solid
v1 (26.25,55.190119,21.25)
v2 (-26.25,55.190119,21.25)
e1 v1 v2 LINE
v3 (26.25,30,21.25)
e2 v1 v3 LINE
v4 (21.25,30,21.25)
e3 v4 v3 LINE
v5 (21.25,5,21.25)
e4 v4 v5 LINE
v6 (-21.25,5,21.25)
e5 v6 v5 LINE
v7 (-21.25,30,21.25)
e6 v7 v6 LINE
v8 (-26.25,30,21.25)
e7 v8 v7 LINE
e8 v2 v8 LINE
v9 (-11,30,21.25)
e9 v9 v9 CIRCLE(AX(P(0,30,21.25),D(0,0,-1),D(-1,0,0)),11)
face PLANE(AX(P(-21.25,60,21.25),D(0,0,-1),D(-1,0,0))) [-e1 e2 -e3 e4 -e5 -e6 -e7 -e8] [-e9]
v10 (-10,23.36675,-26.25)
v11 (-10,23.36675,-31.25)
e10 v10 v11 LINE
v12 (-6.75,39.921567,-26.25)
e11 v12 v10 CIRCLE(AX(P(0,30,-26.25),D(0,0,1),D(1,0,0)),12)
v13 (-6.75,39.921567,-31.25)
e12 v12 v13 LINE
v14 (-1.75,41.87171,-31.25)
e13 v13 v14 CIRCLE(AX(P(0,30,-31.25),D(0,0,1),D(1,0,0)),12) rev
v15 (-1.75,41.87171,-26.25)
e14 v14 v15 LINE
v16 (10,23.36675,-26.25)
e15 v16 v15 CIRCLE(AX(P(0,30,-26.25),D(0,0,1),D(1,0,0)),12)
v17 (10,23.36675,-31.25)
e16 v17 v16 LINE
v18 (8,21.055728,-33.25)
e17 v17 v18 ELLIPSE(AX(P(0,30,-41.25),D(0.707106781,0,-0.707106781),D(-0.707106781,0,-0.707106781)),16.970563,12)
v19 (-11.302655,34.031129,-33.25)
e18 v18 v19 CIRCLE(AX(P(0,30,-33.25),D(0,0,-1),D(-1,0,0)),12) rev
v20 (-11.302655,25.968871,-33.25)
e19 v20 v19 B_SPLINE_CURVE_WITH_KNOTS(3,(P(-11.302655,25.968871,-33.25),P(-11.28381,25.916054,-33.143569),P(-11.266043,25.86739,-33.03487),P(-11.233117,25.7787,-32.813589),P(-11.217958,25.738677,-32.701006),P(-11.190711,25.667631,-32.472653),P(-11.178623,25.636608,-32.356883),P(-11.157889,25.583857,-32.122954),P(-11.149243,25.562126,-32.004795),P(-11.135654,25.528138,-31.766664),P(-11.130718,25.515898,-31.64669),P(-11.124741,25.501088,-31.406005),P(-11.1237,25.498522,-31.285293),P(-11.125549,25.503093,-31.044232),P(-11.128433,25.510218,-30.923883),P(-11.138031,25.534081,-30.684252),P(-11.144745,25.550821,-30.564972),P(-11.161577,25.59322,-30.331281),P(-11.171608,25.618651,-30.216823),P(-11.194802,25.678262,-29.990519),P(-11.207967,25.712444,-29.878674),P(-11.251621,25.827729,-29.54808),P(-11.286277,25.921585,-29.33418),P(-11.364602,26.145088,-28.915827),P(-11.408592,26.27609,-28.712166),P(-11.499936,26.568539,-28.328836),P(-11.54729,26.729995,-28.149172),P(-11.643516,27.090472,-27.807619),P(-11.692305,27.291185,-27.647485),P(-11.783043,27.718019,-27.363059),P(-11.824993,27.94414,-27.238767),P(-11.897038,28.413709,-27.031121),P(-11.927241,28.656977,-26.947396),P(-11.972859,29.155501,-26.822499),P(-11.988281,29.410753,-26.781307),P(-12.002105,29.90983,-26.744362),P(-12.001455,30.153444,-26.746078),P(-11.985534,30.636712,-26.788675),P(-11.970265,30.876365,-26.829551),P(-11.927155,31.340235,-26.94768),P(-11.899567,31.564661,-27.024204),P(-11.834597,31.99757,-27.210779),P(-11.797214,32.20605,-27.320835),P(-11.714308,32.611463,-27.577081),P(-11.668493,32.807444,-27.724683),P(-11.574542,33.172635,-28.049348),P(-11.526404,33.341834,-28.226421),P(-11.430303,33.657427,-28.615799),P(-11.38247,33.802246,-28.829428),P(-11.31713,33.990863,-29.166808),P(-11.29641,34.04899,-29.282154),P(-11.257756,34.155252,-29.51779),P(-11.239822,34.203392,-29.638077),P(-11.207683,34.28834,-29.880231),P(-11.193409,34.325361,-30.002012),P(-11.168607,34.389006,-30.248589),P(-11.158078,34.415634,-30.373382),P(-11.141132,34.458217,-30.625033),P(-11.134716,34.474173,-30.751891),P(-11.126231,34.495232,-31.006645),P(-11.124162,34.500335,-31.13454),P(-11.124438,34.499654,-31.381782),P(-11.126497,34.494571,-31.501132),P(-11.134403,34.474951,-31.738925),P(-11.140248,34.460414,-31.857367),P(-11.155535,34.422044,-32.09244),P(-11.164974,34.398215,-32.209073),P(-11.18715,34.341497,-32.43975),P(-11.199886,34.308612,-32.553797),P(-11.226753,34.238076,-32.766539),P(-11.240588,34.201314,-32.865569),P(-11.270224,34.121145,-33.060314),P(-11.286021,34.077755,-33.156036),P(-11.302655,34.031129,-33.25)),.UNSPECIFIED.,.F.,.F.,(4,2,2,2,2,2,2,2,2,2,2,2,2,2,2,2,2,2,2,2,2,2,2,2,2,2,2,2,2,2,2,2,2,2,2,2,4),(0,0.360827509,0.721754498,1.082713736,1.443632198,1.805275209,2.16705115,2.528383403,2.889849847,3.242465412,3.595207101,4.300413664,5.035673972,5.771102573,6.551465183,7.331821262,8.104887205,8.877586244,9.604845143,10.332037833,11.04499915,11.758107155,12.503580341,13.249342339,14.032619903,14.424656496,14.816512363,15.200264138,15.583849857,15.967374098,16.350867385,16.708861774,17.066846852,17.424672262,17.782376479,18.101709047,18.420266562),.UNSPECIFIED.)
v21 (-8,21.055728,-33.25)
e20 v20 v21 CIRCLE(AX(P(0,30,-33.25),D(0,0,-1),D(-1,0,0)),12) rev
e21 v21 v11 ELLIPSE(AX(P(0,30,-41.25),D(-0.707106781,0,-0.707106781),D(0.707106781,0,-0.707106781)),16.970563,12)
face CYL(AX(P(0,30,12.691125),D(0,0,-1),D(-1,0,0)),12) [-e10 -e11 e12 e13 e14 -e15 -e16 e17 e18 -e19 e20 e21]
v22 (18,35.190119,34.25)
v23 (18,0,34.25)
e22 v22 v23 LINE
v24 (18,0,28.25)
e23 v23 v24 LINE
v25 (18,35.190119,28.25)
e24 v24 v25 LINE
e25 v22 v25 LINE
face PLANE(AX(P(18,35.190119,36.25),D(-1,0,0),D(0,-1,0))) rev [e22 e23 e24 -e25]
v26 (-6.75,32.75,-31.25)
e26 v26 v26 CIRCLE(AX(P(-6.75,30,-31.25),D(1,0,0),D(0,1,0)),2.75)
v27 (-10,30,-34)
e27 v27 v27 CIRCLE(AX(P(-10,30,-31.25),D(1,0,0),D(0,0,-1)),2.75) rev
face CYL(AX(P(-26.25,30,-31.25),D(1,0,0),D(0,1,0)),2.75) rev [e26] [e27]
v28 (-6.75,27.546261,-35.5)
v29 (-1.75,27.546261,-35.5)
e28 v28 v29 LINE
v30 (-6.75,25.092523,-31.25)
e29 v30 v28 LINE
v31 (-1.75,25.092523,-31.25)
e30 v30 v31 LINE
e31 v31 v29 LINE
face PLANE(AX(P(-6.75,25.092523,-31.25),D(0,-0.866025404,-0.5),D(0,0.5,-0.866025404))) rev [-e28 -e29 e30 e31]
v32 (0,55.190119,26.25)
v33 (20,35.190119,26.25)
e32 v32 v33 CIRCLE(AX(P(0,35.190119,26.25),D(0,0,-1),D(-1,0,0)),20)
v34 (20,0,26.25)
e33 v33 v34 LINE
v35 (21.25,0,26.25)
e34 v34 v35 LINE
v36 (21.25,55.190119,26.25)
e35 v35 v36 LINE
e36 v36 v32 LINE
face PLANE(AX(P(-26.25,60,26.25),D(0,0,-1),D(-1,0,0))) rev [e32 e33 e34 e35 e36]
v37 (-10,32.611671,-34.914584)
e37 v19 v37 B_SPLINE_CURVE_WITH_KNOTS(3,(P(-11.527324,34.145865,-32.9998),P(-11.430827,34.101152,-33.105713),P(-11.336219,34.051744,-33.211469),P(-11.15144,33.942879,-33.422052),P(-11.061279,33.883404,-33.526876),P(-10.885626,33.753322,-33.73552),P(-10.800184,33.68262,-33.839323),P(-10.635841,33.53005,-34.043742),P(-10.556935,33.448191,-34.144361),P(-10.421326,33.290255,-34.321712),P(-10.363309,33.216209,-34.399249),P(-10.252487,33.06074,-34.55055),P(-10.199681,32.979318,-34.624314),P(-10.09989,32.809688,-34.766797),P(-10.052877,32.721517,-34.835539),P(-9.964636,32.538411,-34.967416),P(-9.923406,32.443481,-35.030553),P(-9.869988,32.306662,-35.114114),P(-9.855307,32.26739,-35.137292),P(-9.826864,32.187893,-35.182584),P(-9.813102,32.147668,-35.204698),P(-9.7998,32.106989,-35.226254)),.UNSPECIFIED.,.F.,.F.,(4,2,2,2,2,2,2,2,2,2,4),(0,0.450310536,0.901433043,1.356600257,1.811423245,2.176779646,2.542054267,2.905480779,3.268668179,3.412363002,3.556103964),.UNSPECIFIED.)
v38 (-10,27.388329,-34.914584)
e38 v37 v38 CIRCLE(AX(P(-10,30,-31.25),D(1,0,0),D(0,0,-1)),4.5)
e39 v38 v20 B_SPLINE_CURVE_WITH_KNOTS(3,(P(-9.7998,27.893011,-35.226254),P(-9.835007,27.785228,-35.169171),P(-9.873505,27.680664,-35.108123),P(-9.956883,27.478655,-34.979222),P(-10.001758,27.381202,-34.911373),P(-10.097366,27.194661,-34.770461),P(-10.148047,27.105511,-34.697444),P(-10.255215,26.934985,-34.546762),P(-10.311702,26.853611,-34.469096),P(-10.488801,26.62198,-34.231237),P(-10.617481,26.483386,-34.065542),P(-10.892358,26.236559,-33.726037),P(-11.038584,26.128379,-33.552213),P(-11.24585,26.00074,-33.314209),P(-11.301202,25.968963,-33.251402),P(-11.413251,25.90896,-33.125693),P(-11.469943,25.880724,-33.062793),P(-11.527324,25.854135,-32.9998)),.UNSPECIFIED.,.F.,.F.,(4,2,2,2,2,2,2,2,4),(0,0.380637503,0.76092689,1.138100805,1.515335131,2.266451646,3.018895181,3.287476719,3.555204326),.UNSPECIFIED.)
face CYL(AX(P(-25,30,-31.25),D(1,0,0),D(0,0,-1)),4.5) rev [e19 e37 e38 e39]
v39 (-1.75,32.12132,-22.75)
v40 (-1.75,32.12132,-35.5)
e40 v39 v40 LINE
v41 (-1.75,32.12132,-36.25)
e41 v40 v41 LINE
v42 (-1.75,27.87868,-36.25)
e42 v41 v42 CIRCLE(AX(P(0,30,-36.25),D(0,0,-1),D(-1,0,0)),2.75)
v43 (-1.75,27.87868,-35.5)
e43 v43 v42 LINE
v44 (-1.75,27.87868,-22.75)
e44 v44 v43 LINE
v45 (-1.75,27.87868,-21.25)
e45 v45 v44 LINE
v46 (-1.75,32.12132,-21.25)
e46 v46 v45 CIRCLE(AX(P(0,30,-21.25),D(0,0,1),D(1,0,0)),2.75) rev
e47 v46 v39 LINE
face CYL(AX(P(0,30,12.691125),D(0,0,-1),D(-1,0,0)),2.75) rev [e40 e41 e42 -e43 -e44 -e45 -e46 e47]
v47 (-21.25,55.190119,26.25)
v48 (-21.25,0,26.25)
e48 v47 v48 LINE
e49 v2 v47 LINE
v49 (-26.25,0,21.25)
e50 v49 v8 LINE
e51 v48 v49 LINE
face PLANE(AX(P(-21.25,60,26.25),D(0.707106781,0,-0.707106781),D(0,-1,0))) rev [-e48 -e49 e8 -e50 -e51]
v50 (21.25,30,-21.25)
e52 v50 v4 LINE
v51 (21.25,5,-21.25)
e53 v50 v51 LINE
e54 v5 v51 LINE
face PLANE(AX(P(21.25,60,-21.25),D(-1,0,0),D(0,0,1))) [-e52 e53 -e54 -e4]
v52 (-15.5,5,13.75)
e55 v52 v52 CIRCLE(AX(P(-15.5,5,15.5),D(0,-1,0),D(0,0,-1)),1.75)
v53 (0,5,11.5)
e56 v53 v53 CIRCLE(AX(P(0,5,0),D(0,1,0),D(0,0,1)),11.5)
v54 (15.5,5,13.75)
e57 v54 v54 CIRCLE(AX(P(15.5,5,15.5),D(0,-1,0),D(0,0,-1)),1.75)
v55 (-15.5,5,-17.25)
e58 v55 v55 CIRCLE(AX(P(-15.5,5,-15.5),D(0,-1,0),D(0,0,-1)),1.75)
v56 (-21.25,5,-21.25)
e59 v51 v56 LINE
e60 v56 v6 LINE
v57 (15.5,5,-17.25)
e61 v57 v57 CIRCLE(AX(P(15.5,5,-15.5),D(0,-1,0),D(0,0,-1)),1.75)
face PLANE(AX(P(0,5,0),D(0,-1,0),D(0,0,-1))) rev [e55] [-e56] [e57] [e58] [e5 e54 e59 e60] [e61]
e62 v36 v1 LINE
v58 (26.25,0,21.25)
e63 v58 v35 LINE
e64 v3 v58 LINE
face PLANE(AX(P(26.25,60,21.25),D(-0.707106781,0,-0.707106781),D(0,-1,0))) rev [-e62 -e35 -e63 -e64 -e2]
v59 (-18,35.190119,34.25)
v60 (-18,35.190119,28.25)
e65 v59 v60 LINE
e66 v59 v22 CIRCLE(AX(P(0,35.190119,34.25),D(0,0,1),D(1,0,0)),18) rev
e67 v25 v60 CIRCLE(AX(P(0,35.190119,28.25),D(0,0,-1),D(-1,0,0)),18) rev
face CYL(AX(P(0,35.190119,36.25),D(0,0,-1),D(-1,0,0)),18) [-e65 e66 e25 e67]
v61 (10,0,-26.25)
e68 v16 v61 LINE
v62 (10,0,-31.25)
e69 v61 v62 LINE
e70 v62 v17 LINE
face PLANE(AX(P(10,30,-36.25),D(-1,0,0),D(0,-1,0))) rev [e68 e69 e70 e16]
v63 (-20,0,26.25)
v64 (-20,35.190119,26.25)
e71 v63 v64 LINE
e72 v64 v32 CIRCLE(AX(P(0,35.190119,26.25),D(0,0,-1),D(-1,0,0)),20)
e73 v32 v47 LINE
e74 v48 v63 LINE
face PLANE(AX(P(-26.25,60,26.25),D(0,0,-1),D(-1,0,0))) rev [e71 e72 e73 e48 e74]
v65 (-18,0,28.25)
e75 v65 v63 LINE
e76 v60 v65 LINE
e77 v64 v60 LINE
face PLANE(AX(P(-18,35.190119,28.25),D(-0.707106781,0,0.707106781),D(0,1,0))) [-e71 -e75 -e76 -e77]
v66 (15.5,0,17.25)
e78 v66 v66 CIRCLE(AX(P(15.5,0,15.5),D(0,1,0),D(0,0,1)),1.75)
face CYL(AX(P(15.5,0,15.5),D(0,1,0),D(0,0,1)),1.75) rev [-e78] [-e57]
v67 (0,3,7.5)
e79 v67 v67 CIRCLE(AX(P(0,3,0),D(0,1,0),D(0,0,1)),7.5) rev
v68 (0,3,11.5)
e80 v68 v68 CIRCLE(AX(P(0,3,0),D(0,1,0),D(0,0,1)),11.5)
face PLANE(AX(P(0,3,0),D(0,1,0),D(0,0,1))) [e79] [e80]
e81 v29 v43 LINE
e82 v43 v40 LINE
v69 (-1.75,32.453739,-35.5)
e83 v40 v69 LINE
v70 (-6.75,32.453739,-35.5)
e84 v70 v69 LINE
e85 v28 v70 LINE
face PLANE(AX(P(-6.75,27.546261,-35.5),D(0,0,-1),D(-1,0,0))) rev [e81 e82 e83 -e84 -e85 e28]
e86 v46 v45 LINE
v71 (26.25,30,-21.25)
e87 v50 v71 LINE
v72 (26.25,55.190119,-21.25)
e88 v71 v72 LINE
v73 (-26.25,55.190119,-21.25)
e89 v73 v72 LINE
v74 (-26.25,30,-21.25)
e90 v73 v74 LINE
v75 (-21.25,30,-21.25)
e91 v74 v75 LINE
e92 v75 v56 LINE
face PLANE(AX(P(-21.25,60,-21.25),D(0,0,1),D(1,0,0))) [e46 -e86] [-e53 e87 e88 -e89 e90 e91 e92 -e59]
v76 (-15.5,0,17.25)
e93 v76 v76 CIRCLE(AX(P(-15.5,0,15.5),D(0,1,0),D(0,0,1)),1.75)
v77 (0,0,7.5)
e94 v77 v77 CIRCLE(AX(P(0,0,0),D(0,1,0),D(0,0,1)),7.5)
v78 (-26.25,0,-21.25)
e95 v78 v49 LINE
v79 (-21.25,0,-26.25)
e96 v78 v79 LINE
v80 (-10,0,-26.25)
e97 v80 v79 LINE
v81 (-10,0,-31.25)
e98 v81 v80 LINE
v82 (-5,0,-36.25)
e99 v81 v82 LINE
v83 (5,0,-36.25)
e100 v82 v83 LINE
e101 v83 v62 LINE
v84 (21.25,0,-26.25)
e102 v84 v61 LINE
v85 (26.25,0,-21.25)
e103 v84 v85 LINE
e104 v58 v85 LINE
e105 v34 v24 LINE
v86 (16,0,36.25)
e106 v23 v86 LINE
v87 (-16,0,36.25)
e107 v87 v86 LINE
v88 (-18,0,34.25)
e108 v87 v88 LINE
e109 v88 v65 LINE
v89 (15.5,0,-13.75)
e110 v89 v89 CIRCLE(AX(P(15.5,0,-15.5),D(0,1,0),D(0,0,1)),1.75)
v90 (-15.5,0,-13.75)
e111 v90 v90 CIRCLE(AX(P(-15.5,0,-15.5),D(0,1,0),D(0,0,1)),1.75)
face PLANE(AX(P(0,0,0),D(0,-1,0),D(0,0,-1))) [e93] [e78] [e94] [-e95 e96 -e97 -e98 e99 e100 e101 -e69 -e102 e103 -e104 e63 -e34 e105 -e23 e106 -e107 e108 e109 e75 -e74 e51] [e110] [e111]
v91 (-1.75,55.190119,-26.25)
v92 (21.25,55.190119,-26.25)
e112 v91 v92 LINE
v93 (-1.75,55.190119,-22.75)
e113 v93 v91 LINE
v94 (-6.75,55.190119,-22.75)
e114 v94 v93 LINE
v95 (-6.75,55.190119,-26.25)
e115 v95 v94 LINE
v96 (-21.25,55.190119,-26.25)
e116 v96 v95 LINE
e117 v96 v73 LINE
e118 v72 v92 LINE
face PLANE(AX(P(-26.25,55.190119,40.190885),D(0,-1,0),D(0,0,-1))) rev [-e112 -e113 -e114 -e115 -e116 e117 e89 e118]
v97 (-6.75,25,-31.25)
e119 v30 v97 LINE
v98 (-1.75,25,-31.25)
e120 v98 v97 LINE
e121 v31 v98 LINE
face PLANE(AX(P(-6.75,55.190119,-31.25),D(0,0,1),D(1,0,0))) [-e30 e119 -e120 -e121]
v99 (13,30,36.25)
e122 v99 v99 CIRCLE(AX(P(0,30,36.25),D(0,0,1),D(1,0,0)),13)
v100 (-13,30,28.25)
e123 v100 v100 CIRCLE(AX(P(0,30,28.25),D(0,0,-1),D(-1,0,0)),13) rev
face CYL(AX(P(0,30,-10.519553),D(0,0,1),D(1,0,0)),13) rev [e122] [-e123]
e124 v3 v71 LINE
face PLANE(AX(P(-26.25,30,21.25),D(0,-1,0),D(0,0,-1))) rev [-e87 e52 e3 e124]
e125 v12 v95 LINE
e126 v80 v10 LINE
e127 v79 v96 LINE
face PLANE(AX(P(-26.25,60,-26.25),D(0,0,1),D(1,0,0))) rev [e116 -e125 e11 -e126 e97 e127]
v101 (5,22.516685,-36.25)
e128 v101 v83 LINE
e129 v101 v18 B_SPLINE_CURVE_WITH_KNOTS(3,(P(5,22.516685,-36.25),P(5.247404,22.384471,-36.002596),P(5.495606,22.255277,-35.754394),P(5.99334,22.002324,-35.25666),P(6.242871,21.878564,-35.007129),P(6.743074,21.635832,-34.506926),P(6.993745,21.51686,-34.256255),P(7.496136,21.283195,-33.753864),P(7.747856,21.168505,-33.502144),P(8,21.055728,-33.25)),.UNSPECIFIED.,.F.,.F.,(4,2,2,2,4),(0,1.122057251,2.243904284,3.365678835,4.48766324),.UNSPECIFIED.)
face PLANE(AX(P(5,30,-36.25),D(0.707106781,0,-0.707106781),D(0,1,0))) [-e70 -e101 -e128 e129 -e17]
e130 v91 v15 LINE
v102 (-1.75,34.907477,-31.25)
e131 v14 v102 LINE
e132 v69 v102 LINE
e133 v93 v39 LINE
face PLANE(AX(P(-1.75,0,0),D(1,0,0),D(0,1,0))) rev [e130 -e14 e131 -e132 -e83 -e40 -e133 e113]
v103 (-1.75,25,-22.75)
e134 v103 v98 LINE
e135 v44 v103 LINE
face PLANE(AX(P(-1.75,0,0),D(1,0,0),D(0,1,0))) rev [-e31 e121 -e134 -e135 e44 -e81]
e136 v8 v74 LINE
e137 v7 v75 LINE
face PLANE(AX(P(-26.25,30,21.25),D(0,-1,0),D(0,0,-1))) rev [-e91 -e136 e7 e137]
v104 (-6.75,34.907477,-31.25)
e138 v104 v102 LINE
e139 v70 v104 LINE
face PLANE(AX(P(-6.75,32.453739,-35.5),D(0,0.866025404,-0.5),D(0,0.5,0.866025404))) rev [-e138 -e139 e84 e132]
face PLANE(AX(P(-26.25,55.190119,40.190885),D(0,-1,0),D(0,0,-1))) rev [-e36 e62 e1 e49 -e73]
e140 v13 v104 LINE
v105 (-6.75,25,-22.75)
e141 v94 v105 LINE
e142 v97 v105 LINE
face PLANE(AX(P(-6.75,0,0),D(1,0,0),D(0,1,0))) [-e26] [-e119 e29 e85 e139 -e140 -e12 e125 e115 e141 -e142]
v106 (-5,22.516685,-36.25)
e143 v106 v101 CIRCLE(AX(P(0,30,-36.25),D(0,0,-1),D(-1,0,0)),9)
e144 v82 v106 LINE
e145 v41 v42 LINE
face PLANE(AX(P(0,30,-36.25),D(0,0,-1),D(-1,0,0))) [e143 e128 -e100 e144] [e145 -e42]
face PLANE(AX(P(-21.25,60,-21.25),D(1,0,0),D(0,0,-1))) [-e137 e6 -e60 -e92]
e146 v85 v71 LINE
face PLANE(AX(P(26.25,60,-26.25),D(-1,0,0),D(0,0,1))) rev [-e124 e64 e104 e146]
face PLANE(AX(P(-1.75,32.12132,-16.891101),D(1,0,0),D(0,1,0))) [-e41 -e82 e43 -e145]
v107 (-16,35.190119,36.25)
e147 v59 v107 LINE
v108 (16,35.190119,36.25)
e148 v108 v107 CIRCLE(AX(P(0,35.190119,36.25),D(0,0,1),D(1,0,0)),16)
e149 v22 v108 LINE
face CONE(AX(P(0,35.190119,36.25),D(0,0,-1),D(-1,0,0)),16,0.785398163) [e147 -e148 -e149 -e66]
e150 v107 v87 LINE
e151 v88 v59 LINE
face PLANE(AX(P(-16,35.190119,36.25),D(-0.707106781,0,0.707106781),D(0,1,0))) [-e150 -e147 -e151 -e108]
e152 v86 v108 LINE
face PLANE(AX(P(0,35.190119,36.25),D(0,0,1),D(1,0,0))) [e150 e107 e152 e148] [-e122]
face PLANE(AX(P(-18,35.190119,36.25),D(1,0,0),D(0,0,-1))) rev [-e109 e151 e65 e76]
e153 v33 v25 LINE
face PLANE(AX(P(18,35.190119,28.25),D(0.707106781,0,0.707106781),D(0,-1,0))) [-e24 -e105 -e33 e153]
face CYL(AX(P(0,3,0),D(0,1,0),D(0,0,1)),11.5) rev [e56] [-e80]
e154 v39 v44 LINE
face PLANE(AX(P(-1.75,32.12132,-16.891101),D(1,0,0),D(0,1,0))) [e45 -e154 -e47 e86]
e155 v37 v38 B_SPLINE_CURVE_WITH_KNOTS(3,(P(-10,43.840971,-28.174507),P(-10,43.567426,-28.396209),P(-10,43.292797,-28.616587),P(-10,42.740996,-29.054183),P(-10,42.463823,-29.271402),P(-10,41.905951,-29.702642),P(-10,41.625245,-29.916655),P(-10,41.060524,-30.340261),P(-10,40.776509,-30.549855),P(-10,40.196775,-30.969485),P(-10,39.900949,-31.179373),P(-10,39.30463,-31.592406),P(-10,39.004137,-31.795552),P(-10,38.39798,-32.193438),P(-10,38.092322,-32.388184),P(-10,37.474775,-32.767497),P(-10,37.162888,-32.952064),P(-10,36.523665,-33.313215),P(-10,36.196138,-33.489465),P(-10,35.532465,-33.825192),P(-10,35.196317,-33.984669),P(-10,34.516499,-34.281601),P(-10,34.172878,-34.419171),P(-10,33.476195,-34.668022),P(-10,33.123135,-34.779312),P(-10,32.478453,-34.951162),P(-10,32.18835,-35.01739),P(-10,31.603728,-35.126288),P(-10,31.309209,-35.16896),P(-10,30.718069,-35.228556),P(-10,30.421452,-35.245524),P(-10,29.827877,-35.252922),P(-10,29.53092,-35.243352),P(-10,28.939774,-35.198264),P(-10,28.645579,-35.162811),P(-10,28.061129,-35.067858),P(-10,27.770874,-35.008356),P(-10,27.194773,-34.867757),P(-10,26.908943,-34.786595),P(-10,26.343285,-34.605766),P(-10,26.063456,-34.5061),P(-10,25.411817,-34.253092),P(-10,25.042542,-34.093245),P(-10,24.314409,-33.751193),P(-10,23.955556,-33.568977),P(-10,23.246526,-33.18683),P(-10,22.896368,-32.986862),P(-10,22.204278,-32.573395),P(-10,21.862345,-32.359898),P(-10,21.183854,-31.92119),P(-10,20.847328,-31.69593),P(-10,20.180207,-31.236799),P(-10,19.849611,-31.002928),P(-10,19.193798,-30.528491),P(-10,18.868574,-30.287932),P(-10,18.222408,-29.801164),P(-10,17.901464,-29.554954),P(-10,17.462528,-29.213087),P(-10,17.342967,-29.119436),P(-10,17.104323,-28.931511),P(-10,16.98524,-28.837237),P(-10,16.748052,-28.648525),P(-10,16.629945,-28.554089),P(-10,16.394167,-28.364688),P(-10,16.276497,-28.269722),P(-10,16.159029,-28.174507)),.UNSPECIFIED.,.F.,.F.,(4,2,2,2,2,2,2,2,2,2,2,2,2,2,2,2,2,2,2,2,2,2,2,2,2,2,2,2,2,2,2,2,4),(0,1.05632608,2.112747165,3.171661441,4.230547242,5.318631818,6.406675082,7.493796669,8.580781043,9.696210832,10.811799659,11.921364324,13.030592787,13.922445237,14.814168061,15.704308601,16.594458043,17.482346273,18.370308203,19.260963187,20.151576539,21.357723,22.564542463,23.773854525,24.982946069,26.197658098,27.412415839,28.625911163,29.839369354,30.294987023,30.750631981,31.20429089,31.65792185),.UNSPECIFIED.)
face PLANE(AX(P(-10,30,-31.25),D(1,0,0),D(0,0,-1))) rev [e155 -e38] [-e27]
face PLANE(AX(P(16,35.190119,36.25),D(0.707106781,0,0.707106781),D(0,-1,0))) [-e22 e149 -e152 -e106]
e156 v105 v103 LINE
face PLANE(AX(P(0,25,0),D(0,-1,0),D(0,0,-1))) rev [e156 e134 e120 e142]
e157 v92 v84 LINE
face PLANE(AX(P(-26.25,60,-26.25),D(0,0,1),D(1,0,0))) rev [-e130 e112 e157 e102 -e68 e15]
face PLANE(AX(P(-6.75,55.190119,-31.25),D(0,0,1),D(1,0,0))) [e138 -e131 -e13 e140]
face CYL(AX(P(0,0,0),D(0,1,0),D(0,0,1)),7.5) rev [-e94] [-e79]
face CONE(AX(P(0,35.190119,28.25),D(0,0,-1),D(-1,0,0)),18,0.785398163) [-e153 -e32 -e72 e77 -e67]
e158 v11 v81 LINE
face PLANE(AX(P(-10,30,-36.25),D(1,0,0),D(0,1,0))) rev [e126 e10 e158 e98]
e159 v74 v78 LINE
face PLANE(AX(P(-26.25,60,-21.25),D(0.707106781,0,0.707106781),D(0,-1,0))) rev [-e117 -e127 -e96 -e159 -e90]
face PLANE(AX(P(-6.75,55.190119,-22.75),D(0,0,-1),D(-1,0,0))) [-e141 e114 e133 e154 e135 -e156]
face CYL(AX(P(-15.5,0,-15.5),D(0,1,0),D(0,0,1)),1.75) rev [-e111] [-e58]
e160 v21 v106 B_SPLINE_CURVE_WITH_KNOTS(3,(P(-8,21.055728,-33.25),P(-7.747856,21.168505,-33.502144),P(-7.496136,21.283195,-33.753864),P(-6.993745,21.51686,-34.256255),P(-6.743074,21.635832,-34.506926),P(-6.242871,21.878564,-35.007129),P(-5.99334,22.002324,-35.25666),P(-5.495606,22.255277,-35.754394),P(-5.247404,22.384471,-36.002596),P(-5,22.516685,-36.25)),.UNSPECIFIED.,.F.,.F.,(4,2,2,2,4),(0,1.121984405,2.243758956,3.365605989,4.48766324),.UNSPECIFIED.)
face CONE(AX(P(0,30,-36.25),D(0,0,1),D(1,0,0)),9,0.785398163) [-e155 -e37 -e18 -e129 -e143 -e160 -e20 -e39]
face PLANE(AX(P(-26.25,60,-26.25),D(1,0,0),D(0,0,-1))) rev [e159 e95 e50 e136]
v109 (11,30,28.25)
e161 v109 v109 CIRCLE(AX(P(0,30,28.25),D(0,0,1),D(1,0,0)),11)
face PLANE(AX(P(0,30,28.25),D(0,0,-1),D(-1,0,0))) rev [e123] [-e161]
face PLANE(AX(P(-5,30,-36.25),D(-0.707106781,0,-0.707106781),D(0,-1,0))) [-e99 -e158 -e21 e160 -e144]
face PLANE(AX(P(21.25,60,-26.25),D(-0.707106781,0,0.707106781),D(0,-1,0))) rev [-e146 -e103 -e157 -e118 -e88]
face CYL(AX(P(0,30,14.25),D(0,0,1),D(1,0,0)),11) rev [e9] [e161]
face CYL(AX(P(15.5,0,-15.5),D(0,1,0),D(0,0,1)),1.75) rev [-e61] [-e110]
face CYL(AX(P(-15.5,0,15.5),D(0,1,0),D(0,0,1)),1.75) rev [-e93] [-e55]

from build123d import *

# Parameters (mm, degrees)
SKETCH1_W                = 52.5
SKETCH1_H                = 52.5
SKETCH1_W_2              = 42.5
SKETCH1_H_2              = 42.5
BOSS_EXTRUDE1_DEPTH      = 60
SKETCH2_W                = 42.5
SKETCH2_H                = 42.5
BOSS_EXTRUDE2_DEPTH      = 5
CUT_EXTRUDE1_DEPTH       = 67.3560472
CUT_EXTRUDE1_DEPTH_BACK  = 67.3560472
SKETCH3_R                = 1.75
SKETCH3_R_2              = 7.5
SKETCH4_R                = 11.5
CUT_EXTRUDE2_DEPTH       = 2
SKETCH5_R                = 0.75
SKETCH5_R_2              = 3.5
BOSS_EXTRUDE3_DEPTH      = 10
CUT_EXTRUDE3_DEPTH       = 84.936359821
CUT_EXTRUDE3_DEPTH_BACK  = 84.936359821
SKETCH6_W                = 52.5
SKETCH6_H                = 16.216064207
CUT_EXTRUDE4_START       = -23
SKETCH7_R                = 3.5
SKETCH7_R_2              = 0.75
CUT_EXTRUDE4_DEPTH       = 23
CHAMFER1_SIZE            = 5
CHAMFER3_SIZE            = 2
CHAMFER4_SIZE            = 1
SKETCH8_R                = 13
BOSS_EXTRUDE4_DEPTH      = 10
SKETCH9_R                = 12
CUT_EXTRUDE5_DEPTH       = 10
CHAMFER5_SIZE            = 2
CUT_EXTRUDE6_DEPTH       = 85.677697815
CUT_EXTRUDE6_DEPTH_BACK  = 85.677697815
SKETCH10_W               = 42.5
SKETCH10_H               = 45.698966911
SKETCH11_R               = 13
CUT_EXTRUDE7_DEPTH       = 10
SKETCH12_R               = 13
BOSS_EXTRUDE6_DEPTH      = 15
BOSS_EXTRUDE7_START      = -8
SKETCH13_R               = 13
BOSS_EXTRUDE7_DEPTH      = 7
SKETCH14_R               = 11
CUT_EXTRUDE8_DEPTH       = 14
SKETCH15_W               = 68.151817742
SKETCH15_H               = 162.163599098
CUT_EXTRUDE9_DEPTH       = 34
BOSS_EXTRUDE8_REACH      = 99.7
SKETCH16_R               = 12
SKETCH16_R_2             = 2.75
BOSS_EXTRUDE9_DEPTH      = 15
CHAMFER6_SIZE            = 3
CUT_EXTRUDE10_DEPTH      = 75.854024608
CUT_EXTRUDE10_DEPTH_BACK = 75.854024608
SKETCH18_W               = 80.381770786
SKETCH18_H               = 10.493887453
SKETCH19_R               = 2.75
CUT_EXTRUDE11_DEPTH      = 5
CUT_EXTRUDE12_START      = 25
SKETCH20_W               = 5
SKETCH20_H               = 8.5
CUT_EXTRUDE12_DEPTH      = 47.056838389
CUT_EXTRUDE13_DEPTH      = 72.721766444
CUT_EXTRUDE15_START      = -10
SKETCH21_R               = 4.5
CUT_EXTRUDE15_DEPTH      = 15


with BuildPart() as part:
    # Sketch1 → Boss-Extrude1 (new body)
    with BuildSketch(Plane(origin=(0, 0, 0), x_dir=(1, 0, 0), z_dir=(0, 1, 0))):
        Rectangle(SKETCH1_W, SKETCH1_H)
        Rectangle(SKETCH1_W_2, SKETCH1_H_2, mode=Mode.SUBTRACT)
    extrude(amount=BOSS_EXTRUDE1_DEPTH)

    # Sketch2 → Boss-Extrude2 (add)
    with BuildSketch(Plane(origin=(0, 0, 0), x_dir=(1, 0, 0), z_dir=(0, 1, 0))):
        Rectangle(SKETCH2_W, SKETCH2_H)
    extrude(amount=BOSS_EXTRUDE2_DEPTH)

    # Sketch3 → Cut-Extrude1 (cut, two sides: drawn at the far end of the back side and taken through both)
    with BuildSketch(Plane(origin=(0, 5, 0), x_dir=(1, 0, 0), z_dir=(0, 1, 0)).offset(-CUT_EXTRUDE1_DEPTH_BACK)):
        with Locations(Location((-15.5, 15.5, 0), (0, 0, 270))):
            Circle(SKETCH3_R)
        with Locations(Location((-15.5, -15.5, 0), (0, 0, 270))):
            Circle(SKETCH3_R)
        with Locations(Location((15.5, 15.5, 0), (0, 0, 270))):
            Circle(SKETCH3_R)
        with Locations(Location((15.5, -15.5, 0), (0, 0, 270))):
            Circle(SKETCH3_R)
        with Locations(Location((0, 0, 0), (0, 0, 270))):
            Circle(SKETCH3_R_2)
    extrude(amount=CUT_EXTRUDE1_DEPTH + CUT_EXTRUDE1_DEPTH_BACK, mode=Mode.SUBTRACT)

    # Sketch4 → Cut-Extrude2 (cut)
    with BuildSketch(Plane(origin=(0, 5, 0), x_dir=(1, 0, 0), z_dir=(0, 1, 0))):
        with Locations(Location((0, 0, 0), (0, 0, 270))):
            Circle(SKETCH4_R)
    extrude(amount=-CUT_EXTRUDE2_DEPTH, mode=Mode.SUBTRACT)

    # Sketch5 → Boss-Extrude3 (add)
    with BuildSketch(Plane(origin=(0, 0, -26.25), x_dir=(-1, 0, 0), z_dir=(0, 0, -1))):
        with BuildLine():
            Line((10, 30), (10, -2.899053056))
            ThreePointArc((10, -2.899053056), (0, -12.899053056), (-10, -2.899053056))
            Line((-10, -2.899053056), (-10, 30))
            ThreePointArc((-10, 30), (0, 40), (10, 30))
        make_face()
        with Locations((-4, 37)):
            Circle(SKETCH5_R, mode=Mode.SUBTRACT)
        with Locations((0, 37)):
            Circle(SKETCH5_R, mode=Mode.SUBTRACT)
        with Locations((4, 37)):
            Circle(SKETCH5_R, mode=Mode.SUBTRACT)
        with Locations((-7, 34)):
            Circle(SKETCH5_R, mode=Mode.SUBTRACT)
        with Locations((-7, 30)):
            Circle(SKETCH5_R, mode=Mode.SUBTRACT)
        with Locations((-7, 26)):
            Circle(SKETCH5_R, mode=Mode.SUBTRACT)
        with Locations((-4, 23)):
            Circle(SKETCH5_R, mode=Mode.SUBTRACT)
        with Locations((0, 23)):
            Circle(SKETCH5_R, mode=Mode.SUBTRACT)
        with Locations((4, 23)):
            Circle(SKETCH5_R, mode=Mode.SUBTRACT)
        with Locations((7, 26)):
            Circle(SKETCH5_R, mode=Mode.SUBTRACT)
        with Locations((7, 30)):
            Circle(SKETCH5_R, mode=Mode.SUBTRACT)
        with Locations((7, 34)):
            Circle(SKETCH5_R, mode=Mode.SUBTRACT)
        with Locations((0, 30)):
            Circle(SKETCH5_R_2, mode=Mode.SUBTRACT)
    extrude(amount=BOSS_EXTRUDE3_DEPTH)

    # Sketch6 → Cut-Extrude3 (cut, two sides: drawn at the far end of the back side and taken through both)
    with BuildSketch(Plane(origin=(0, 0, -26.25), x_dir=(-1, 0, 0), z_dir=(0, 0, -1)).offset(-CUT_EXTRUDE3_DEPTH_BACK)):
        with Locations((0, -8.108032104)):
            Rectangle(SKETCH6_W, SKETCH6_H)
    extrude(amount=CUT_EXTRUDE3_DEPTH + CUT_EXTRUDE3_DEPTH_BACK, mode=Mode.SUBTRACT)

    # Sketch7 → Cut-Extrude4 (cut)
    with BuildSketch(Plane(origin=(0, 0, -26.25), x_dir=(-1, 0, 0), z_dir=(0, 0, -1)).offset(CUT_EXTRUDE4_START)):
        with Locations(Location((0, 30, 0), (0, 0, 180))):
            Circle(SKETCH7_R)
        with Locations(Location((-4, 37, 0), (0, 0, 180))):
            Circle(SKETCH7_R_2)
        with Locations(Location((0, 37, 0), (0, 0, 180))):
            Circle(SKETCH7_R_2)
        with Locations(Location((4, 37, 0), (0, 0, 180))):
            Circle(SKETCH7_R_2)
        with Locations(Location((7, 34, 0), (0, 0, 180))):
            Circle(SKETCH7_R_2)
        with Locations(Location((7, 30, 0), (0, 0, 180))):
            Circle(SKETCH7_R_2)
        with Locations(Location((7, 26, 0), (0, 0, 180))):
            Circle(SKETCH7_R_2)
        with Locations(Location((4, 23, 0), (0, 0, 180))):
            Circle(SKETCH7_R_2)
        with Locations(Location((0, 23, 0), (0, 0, 180))):
            Circle(SKETCH7_R_2)
        with Locations(Location((-4, 23, 0), (0, 0, 180))):
            Circle(SKETCH7_R_2)
        with Locations(Location((-7, 26, 0), (0, 0, 180))):
            Circle(SKETCH7_R_2)
        with Locations(Location((-7, 30, 0), (0, 0, 180))):
            Circle(SKETCH7_R_2)
        with Locations(Location((-7, 34, 0), (0, 0, 180))):
            Circle(SKETCH7_R_2)
    extrude(amount=CUT_EXTRUDE4_DEPTH, mode=Mode.SUBTRACT)

    # Chamfer1
    # the kernel refuses this chamfer: 5 mm, written as the material it takes off along each edge
    with BuildSketch(Plane(origin=(26.25, -12.85841494, 26.25), x_dir=(-0.9996219169112968, 0, 0.027495876610586317), z_dir=(0, 1, 0)), Plane(origin=(-26.25, -12.85841494, 26.25), x_dir=(-0.027495876610586317, 0, -0.9996219169112968), z_dir=(0, 1, 0))) as chamfer1_piece_1:
        Polygon((CHAMFER1_SIZE * 0.999621916911, -CHAMFER1_SIZE * 0.0274958766106), (-CHAMFER1_SIZE * 0.0274958766106, -CHAMFER1_SIZE * 0.999621916911), (0, 0), align=None)
    extrude(amount=85.71682988, mode=Mode.SUBTRACT)
    with BuildSketch(Plane(origin=(26.25, -12.85841494, -26.25), x_dir=(-0.9996219169112968, 0, -0.027495876610586317), z_dir=(0, 1, 0)), Plane(origin=(-26.25, -12.85841494, -26.25), x_dir=(-0.027495876610586317, 0, 0.9996219169112968), z_dir=(0, 1, 0))) as chamfer1_piece_2:
        Polygon((CHAMFER1_SIZE * 0.999621916911, CHAMFER1_SIZE * 0.0274958766106), (-CHAMFER1_SIZE * 0.0274958766106, CHAMFER1_SIZE * 0.999621916911), (0, 0), align=None)
    extrude(amount=85.71682988, mode=Mode.SUBTRACT)
    with BuildSketch(Plane(origin=(-10, 30, -36.25), x_dir=(-0.027495876610586317, 0, 0.9996219169112968), z_dir=(0, -1, 0)), Plane(origin=(10, -12.85841494, -36.25), x_dir=(0.027495876610586317, 0, 0.9996219169112968), z_dir=(0, 1, 0))) as chamfer1_piece_3:
        Polygon((CHAMFER1_SIZE * 0.999621916911, -CHAMFER1_SIZE * 0.0274958766106), (-CHAMFER1_SIZE * 0.0274958766106, -CHAMFER1_SIZE * 0.999621916911), (0, 0), align=None)
    extrude(amount=42.85841494, mode=Mode.SUBTRACT)
    with BuildSketch(Plane(origin=(0, 30, -36.25), x_dir=(1, 0, 0), z_dir=(0, -1, 0))) as chamfer1_piece_4:
        Polygon((10, CHAMFER1_SIZE), (10 - CHAMFER1_SIZE, 0), (10, 0), align=None)
    revolve(axis=Axis((0, 30, -36.25), (0, 0, 1)), revolution_arc=180, mode=Mode.SUBTRACT)

    # Chamfer3
    chamfer3_edges = [part.edges().sort_by_distance(p)[0] for p in [
        (21.25, 60, 0),
        (0, 60, -21.25),
        (-21.25, 60, 0),
        (0, 60, 21.25),
    ]]
    chamfer(chamfer3_edges, length=CHAMFER3_SIZE)

    # Chamfer4
    chamfer4_edges = [part.edges().sort_by_distance(p)[0] for p in [
        (-3.5, 30, -21.25),
        (3.5, 30, -36.25),
    ]]
    chamfer(chamfer4_edges, length=CHAMFER4_SIZE)

    # Sketch8 → Boss-Extrude4 (add)
    with BuildSketch(Plane.XY.offset(26.25)):
        with BuildLine():
            Line((18, 35.190119423), (18, 0))
            Line((18, 0), (-18, 0))
            Line((-18, 0), (-18, 35.190119423))
            ThreePointArc((-18, 35.190119423), (0, 53.190119423), (18, 35.190119423))
        make_face()
        with Locations((0, 35.190119423)):
            Circle(SKETCH8_R, mode=Mode.SUBTRACT)
    extrude(amount=BOSS_EXTRUDE4_DEPTH)

    # Sketch9 → Cut-Extrude5 (cut)
    with BuildSketch(Plane.XY.offset(26.25)):
        with Locations((0, 35.190119423)):
            Circle(SKETCH9_R)
    extrude(amount=-CUT_EXTRUDE5_DEPTH, mode=Mode.SUBTRACT)

    # Chamfer5
    chamfer5_edges = [part.edges().sort_by_distance(p)[0] for p in [
        (0, 53.190119423, 36.25),
        (-18, 17.595059711, 36.25),
        (18, 17.595059711, 36.25),
        (0, 53.190119423, 26.25),
        (-18, 17.595059711, 26.25),
        (18, 17.595059711, 26.25),
    ]]
    chamfer(chamfer5_edges, length=CHAMFER5_SIZE)

    # Sketch10 → Cut-Extrude6 (cut, two sides: drawn at the far end of the back side and taken through both)
    with BuildSketch(Plane(origin=(-21.25, 0, 0), x_dir=(0, 0, -1), z_dir=(1, 0, 0)).offset(-CUT_EXTRUDE6_DEPTH_BACK)):
        with Locations((0, 52.849483455)):
            Rectangle(SKETCH10_W, SKETCH10_H)
    extrude(amount=CUT_EXTRUDE6_DEPTH + CUT_EXTRUDE6_DEPTH_BACK, mode=Mode.SUBTRACT)

    # Sketch11 → Cut-Extrude7 (cut)
    with BuildSketch(Plane.XY.offset(36.25)):
        with Locations((0, 30)):
            Circle(SKETCH11_R)
    extrude(amount=-CUT_EXTRUDE7_DEPTH, mode=Mode.SUBTRACT)

    # Sketch12 → Boss-Extrude6 (add)
    with BuildSketch(Plane.XY.offset(36.25)):
        with BuildLine():
            Line((13.742429917, 37), (13.742429917, 8.778772007))
            ThreePointArc((13.742429917, 8.778772007), (0, -4.96365791), (-13.742429917, 8.778772007))
            Line((-13.742429917, 8.778772007), (-13.742429917, 37))
            ThreePointArc((-13.742429917, 37), (0, 50.742429917), (13.742429917, 37))
        make_face()
        with Locations((0, 30)):
            Circle(SKETCH12_R, mode=Mode.SUBTRACT)
    extrude(amount=-BOSS_EXTRUDE6_DEPTH)

    # Sketch13 → Boss-Extrude7 (add)
    with BuildSketch(Plane.XY.offset(36.25).offset(BOSS_EXTRUDE7_START)):
        with Locations((0, 30)):
            Circle(SKETCH13_R)
    extrude(amount=-BOSS_EXTRUDE7_DEPTH)

    # Sketch14 → Cut-Extrude8 (cut)
    with BuildSketch(Plane.XY.offset(28.25)):
        with Locations((0, 30)):
            Circle(SKETCH14_R)
    extrude(amount=-CUT_EXTRUDE8_DEPTH, mode=Mode.SUBTRACT)

    # Sketch15 → Cut-Extrude9 (cut)
    with BuildSketch(Plane.XZ):
        Rectangle(SKETCH15_W, SKETCH15_H)
    extrude(amount=CUT_EXTRUDE9_DEPTH, mode=Mode.SUBTRACT)

    # Boss-Extrude8: up to this face of the body (flat: up to its plane)
    boss_extrude8_end = Plane(part.part.faces().sort_by_distance((23.75, 30.760345316, -21.25))[0])
    # Sketch16 → Boss-Extrude8 (add, up to the picked face)
    with BuildSketch(Plane(origin=(0, 0, -36.25), x_dir=(-1, 0, 0), z_dir=(0, 0, -1)), mode=Mode.PRIVATE) as boss_extrude8_sk1:
        with Locations((0, 30)):
            Circle(SKETCH16_R)
        with Locations((0, 30)):
            Circle(SKETCH16_R_2, mode=Mode.SUBTRACT)
    boss_extrude8_tool1 = split(extrude(boss_extrude8_sk1.sketch, amount=-BOSS_EXTRUDE8_REACH, mode=Mode.PRIVATE), bisect_by=boss_extrude8_end, keep=Keep.BOTH, mode=Mode.PRIVATE)
    add(boss_extrude8_tool1.solids().sort_by(Axis((11.660589, 30, -36.25), (0, 0, 1)))[0])

    # Sketch17 → Boss-Extrude9 (add)
    with BuildSketch(Plane(origin=(0, 0, -36.25), x_dir=(-1, 0, 0), z_dir=(0, 0, -1))):
        with BuildLine():
            Line((1.75, 32.121320344), (1.75, 27.878679656))
            ThreePointArc((1.75, 27.878679656), (2.75, 30), (1.75, 32.121320344))
        make_face()
    extrude(amount=-BOSS_EXTRUDE9_DEPTH)

    # Chamfer6
    chamfer6_edges = [part.edges().sort_by_distance(p)[0] for p in [
        (0, 42, -36.25),
    ]]
    chamfer(chamfer6_edges, length=CHAMFER6_SIZE)

    # Sketch18 → Cut-Extrude10 (cut, two sides: drawn at the far end of the back side and taken through both)
    with BuildSketch(Plane(origin=(0, 0, 0), x_dir=(0, 0, -1), z_dir=(1, 0, 0)).offset(-CUT_EXTRUDE10_DEPTH_BACK)):
        with Locations((0, 60.43706315)):
            Rectangle(SKETCH18_W, SKETCH18_H)
    extrude(amount=CUT_EXTRUDE10_DEPTH + CUT_EXTRUDE10_DEPTH_BACK, mode=Mode.SUBTRACT)

    # Sketch19 → Cut-Extrude11 (cut)
    with BuildSketch(Plane(origin=(-1.75, 0, 0), x_dir=(0, 0, -1), z_dir=(1, 0, 0))):
        Polygon((31.25, 34.907477288), (27, 32.453738644), (27, 27.546261356), (31.25, 25.092522712), (35.5, 27.546261356), (35.5, 32.453738644), align=None)
        with Locations(Location((31.25, 30, 0), (0, 0, 90))):
            Circle(SKETCH19_R, mode=Mode.SUBTRACT)
    extrude(amount=-CUT_EXTRUDE11_DEPTH, mode=Mode.SUBTRACT)

    # Sketch20 → Cut-Extrude12 (cut, through all)
    with BuildSketch(Plane(origin=(0, 0, 0), x_dir=(1, 0, 0), z_dir=(0, 1, 0)).offset(CUT_EXTRUDE12_START)):
        with Locations((-4.25, 27)):
            Rectangle(SKETCH20_W, SKETCH20_H)
    extrude(amount=CUT_EXTRUDE12_DEPTH, mode=Mode.SUBTRACT)

    # Sketch19<2> → Cut-Extrude13 (cut, through all)
    with BuildSketch(Plane(origin=(-1.75, 0, 0), x_dir=(0, 0, -1), z_dir=(1, 0, 0))):
        with BuildLine():
            Line((33, 32.121320344), (29.5, 32.121320344))
            ThreePointArc((29.5, 32.121320344), (28.5, 30), (29.5, 27.878679656))
            Line((29.5, 27.878679656), (33, 27.878679656))
            ThreePointArc((33, 27.878679656), (33.737468593, 28.82739606), (34, 30))
            ThreePointArc((34, 30), (33.737468593, 31.17260394), (33, 32.121320344))
        make_face()
        with BuildLine():
            ThreePointArc((33, 32.121320344), (31.25, 32.75), (29.5, 32.121320344))
            Line((29.5, 32.121320344), (33, 32.121320344))
        make_face()
        with BuildLine():
            Line((33, 27.878679656), (29.5, 27.878679656))
            ThreePointArc((29.5, 27.878679656), (31.25, 27.25), (33, 27.878679656))
        make_face()
    extrude(amount=-CUT_EXTRUDE13_DEPTH, mode=Mode.SUBTRACT)

    # Sketch21 → Cut-Extrude15 (cut)
    with BuildSketch(Plane(origin=(0, 0, 0), x_dir=(0, 0, -1), z_dir=(1, 0, 0)).offset(CUT_EXTRUDE15_START)):
        with Locations((31.25, 30)):
            Circle(SKETCH21_R)
    extrude(amount=-CUT_EXTRUDE15_DEPTH, mode=Mode.SUBTRACT)


solid = part.part
